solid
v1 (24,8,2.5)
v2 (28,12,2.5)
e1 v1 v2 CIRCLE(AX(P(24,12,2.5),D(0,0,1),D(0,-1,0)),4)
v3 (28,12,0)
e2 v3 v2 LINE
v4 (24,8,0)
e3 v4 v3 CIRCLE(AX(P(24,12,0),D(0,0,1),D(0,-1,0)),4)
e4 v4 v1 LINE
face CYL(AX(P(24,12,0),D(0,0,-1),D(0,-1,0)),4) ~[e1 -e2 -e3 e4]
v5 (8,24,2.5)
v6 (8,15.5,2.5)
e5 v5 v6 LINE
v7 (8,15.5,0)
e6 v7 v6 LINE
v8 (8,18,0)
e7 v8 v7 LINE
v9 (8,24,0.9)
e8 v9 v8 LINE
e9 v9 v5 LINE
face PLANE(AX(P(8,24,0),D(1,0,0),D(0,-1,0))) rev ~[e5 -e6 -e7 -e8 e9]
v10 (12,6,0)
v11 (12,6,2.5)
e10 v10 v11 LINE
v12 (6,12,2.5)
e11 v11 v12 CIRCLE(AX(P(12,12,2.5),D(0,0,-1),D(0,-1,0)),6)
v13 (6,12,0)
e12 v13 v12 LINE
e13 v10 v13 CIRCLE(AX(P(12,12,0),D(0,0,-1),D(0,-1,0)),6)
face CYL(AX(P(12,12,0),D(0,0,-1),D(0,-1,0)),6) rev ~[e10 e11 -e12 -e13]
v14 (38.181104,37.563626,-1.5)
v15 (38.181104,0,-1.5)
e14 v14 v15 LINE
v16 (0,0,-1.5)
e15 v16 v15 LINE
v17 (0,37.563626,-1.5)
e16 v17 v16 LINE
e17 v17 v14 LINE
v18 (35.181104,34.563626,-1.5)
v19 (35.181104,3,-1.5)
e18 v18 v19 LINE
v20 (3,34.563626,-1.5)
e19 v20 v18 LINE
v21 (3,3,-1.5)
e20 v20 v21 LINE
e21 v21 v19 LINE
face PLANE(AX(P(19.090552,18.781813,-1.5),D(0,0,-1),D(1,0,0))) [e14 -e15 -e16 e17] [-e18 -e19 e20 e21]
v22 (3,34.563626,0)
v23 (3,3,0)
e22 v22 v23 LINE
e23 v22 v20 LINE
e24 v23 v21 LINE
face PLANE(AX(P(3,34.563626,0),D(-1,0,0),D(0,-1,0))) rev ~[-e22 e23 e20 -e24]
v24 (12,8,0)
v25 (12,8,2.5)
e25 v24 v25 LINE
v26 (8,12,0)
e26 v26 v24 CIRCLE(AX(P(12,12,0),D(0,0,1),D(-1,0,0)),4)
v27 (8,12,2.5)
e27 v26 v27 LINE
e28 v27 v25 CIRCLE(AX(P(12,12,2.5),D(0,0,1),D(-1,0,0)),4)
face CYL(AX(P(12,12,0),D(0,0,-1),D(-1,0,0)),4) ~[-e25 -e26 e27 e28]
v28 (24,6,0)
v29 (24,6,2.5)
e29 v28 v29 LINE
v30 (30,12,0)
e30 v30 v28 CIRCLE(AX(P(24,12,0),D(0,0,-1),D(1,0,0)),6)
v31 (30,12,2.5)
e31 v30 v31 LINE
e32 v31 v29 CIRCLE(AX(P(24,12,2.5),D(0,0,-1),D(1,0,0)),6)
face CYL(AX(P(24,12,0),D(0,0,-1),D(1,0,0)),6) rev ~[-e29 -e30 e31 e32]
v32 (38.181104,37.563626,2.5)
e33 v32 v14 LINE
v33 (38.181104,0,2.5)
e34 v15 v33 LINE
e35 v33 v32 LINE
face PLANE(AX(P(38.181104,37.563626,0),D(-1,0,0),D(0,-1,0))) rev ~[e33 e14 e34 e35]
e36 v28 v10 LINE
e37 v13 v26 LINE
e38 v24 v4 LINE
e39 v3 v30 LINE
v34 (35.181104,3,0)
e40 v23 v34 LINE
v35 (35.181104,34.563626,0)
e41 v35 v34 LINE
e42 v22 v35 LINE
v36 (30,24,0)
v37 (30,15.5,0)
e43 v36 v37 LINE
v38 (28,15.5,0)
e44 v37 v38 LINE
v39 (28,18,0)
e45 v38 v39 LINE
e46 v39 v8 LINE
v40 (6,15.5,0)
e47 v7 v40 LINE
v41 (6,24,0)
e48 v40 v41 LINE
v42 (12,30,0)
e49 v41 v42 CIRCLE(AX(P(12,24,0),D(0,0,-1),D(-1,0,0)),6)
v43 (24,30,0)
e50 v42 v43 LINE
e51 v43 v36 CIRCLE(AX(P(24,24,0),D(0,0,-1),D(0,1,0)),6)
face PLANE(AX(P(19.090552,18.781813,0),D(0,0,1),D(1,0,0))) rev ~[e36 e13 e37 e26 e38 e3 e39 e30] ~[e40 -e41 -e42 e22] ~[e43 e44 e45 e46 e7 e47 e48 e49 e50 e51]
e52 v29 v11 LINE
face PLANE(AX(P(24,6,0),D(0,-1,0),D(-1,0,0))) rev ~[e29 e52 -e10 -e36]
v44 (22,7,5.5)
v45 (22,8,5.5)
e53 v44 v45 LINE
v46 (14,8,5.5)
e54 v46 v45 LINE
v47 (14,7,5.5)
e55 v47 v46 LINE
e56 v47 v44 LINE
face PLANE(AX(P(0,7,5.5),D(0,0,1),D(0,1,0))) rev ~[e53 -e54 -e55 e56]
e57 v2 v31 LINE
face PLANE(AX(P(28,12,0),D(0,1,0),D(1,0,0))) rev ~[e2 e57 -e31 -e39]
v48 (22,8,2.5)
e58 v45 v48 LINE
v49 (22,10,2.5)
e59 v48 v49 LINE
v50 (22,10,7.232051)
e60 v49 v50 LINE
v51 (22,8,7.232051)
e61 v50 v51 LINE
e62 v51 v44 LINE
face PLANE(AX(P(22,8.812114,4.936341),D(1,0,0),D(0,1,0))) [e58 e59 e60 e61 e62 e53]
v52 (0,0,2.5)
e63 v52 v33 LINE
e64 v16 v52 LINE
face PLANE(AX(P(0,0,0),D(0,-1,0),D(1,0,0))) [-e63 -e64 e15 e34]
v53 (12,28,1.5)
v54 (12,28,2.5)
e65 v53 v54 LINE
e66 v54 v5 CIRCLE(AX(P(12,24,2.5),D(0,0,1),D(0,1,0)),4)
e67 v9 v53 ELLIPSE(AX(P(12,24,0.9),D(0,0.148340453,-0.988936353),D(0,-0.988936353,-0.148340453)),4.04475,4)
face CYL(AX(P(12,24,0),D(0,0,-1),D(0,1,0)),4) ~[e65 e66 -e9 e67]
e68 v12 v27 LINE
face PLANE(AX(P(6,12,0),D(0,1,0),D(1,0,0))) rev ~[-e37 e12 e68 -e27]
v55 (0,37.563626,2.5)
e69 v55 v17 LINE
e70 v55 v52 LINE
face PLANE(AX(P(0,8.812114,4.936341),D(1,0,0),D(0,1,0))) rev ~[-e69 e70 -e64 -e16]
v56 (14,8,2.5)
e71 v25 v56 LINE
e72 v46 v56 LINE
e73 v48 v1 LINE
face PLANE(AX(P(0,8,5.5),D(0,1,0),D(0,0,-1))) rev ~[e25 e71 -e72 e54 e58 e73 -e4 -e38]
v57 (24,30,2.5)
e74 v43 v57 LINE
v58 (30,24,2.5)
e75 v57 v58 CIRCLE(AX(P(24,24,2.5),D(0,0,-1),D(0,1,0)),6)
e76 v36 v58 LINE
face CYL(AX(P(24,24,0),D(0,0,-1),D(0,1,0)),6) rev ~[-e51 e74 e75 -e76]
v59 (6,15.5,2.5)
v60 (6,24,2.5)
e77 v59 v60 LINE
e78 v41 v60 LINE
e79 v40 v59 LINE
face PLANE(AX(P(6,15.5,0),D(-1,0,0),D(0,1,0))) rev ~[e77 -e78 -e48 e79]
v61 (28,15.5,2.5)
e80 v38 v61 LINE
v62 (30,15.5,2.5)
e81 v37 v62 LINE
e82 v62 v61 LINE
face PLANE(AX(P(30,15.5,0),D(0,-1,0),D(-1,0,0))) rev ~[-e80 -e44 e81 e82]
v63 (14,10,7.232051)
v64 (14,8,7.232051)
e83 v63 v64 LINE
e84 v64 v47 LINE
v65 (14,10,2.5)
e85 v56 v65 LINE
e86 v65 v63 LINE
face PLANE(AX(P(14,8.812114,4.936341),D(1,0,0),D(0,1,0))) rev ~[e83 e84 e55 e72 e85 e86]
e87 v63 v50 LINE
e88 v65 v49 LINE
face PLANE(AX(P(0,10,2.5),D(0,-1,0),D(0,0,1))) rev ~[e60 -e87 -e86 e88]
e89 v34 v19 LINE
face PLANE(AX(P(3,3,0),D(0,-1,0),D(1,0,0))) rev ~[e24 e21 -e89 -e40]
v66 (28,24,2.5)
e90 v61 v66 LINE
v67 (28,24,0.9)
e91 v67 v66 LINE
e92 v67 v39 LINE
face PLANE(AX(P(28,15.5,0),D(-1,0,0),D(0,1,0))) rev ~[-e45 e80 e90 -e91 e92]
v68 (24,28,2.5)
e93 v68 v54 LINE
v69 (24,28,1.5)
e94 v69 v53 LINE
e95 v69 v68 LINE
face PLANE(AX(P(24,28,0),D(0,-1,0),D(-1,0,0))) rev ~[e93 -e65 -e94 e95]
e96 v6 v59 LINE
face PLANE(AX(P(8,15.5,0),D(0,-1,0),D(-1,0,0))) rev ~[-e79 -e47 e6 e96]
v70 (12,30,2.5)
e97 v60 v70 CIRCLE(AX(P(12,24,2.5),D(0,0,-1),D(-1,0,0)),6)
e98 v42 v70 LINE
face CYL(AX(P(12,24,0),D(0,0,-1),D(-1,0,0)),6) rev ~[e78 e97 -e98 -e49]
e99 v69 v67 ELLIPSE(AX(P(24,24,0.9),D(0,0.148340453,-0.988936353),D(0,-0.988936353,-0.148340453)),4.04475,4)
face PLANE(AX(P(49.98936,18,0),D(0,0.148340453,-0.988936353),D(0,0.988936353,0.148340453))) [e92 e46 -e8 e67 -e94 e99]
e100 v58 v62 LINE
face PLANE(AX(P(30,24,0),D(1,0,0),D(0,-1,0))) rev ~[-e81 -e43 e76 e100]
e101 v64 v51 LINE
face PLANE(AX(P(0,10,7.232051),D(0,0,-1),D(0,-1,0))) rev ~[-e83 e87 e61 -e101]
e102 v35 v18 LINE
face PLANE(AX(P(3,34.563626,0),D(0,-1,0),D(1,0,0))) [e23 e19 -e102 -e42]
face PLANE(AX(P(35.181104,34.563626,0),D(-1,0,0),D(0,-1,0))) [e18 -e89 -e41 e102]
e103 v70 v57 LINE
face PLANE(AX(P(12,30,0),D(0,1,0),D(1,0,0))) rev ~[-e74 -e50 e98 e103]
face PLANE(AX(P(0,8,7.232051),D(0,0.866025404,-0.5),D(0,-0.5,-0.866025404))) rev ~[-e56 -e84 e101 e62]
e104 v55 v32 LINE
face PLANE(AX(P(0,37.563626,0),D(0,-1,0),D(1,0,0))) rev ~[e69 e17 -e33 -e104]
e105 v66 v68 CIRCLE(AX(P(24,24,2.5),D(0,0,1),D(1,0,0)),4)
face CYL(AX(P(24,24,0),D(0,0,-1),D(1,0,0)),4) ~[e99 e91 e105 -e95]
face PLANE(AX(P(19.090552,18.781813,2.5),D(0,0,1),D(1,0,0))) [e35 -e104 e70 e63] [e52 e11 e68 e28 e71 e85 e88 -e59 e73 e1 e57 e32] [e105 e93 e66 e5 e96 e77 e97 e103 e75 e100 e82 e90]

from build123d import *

# Parameters (mm, degrees)
F0_W        = 38.181103766
F0_H        = 37.5636257231
F1_DEPTH    = 2.5
F2_W        = 38.181103766
F2_H        = 37.5636257231
F2_W_2      = 32.181103766
F2_H_2      = 31.5636257231
F3_DEPTH    = 1.5
F5_DEPTH    = 22
F6_DEPTH    = 14
F7_T4_DEPTH = 63.9787194011


# Not quite as in the source:
# - a fillet or chamfer that OpenCascade refuses, or shapes differently, is made with other operations: its cross-section is extruded or revolved along the edge and cut away or added


with BuildPart() as f1:
    # F0 (on Top) → F1 (new body)
    with BuildSketch(Plane.XY):
        with Locations((19.090551883, 18.7818128616)):
            Rectangle(F0_W, F0_H)
        with BuildLine():
            ThreePointArc((8, 12), (9.1715728753, 9.1715728753), (12, 8))
            Line((12, 8), (24, 8))
            ThreePointArc((24, 8), (26.8284271247, 9.1715728753), (28, 12))
            Line((28, 12), (30, 12))
            ThreePointArc((30, 12), (28.2426406871, 7.7573593129), (24, 6))
            Line((24, 6), (12, 6))
            ThreePointArc((12, 6), (7.7573593129, 7.7573593129), (6, 12))
            Line((6, 12), (8, 12))
        make_face(mode=Mode.SUBTRACT)
        with BuildLine():
            Line((24, 28), (12, 28))
            ThreePointArc((12, 28), (9.1715728753, 26.8284271247), (8, 24))
            Line((8, 24), (8, 15.5))
            Line((8, 15.5), (6, 15.5))
            Line((6, 15.5), (6, 24))
            ThreePointArc((6, 24), (7.7573593129, 28.2426406871), (12, 30))
            Line((12, 30), (24, 30))
            ThreePointArc((24, 30), (28.2426406871, 28.2426406871), (30, 24))
            Line((30, 24), (30, 15.5))
            Line((30, 15.5), (28, 15.5))
            Line((28, 15.5), (28, 24))
            ThreePointArc((28, 24), (26.8284271247, 26.8284271247), (24, 28))
        make_face(mode=Mode.SUBTRACT)
    extrude(amount=F1_DEPTH)

    # F2 (on face) → F3 (join)
    with BuildSketch(Plane(origin=(0, 0, 0), x_dir=(1, 0, 0), z_dir=(0, 0, -1))):
        with Locations((19.090551883, -18.7818128616)):
            Rectangle(F2_W, F2_H)
        with Locations((19.090551883, -18.7818128616)):
            Rectangle(F2_W_2, F2_H_2, mode=Mode.SUBTRACT)
    extrude(amount=F3_DEPTH)

    # F4 (on Right) → F5 (join)
    with BuildSketch(Plane.YZ):
        Polygon((8, 5.5), (8, 2.5), (10, 2.5), (10, 7.2320508076), (8, 7.2320508076), (7, 5.5), align=None)
    extrude(amount=F5_DEPTH)

    # F4 (on Right) → F6 (cut)
    with BuildSketch(Plane.YZ):
        Polygon((8, 5.5), (8, 2.5), (10, 2.5), (10, 7.2320508076), (8, 7.2320508076), (7, 5.5), align=None)
    extrude(amount=F6_DEPTH, mode=Mode.SUBTRACT)

    # F7: chamfer of 10 x 1.5 on 1 edges, made by hand


with BuildPart() as f7_tool2:
    # F7_s3 → F7_t4 (new body)
    with BuildSketch(Plane.YZ.offset(49.9893597005)):
        Polygon((18, 0), (28, 1.5), (28, 0), align=None)
    extrude(amount=-F7_T4_DEPTH)

    split(bisect_by=Plane.YZ.offset(8), keep=Keep.TOP)

    split(bisect_by=Plane.YZ.offset(28), keep=Keep.BOTTOM)


with BuildPart() as f1_1:
    add(f1.part)

    # F7_t1: cut F7_tool2
    add(f7_tool2.part, mode=Mode.SUBTRACT)


solid = f1_1.part
